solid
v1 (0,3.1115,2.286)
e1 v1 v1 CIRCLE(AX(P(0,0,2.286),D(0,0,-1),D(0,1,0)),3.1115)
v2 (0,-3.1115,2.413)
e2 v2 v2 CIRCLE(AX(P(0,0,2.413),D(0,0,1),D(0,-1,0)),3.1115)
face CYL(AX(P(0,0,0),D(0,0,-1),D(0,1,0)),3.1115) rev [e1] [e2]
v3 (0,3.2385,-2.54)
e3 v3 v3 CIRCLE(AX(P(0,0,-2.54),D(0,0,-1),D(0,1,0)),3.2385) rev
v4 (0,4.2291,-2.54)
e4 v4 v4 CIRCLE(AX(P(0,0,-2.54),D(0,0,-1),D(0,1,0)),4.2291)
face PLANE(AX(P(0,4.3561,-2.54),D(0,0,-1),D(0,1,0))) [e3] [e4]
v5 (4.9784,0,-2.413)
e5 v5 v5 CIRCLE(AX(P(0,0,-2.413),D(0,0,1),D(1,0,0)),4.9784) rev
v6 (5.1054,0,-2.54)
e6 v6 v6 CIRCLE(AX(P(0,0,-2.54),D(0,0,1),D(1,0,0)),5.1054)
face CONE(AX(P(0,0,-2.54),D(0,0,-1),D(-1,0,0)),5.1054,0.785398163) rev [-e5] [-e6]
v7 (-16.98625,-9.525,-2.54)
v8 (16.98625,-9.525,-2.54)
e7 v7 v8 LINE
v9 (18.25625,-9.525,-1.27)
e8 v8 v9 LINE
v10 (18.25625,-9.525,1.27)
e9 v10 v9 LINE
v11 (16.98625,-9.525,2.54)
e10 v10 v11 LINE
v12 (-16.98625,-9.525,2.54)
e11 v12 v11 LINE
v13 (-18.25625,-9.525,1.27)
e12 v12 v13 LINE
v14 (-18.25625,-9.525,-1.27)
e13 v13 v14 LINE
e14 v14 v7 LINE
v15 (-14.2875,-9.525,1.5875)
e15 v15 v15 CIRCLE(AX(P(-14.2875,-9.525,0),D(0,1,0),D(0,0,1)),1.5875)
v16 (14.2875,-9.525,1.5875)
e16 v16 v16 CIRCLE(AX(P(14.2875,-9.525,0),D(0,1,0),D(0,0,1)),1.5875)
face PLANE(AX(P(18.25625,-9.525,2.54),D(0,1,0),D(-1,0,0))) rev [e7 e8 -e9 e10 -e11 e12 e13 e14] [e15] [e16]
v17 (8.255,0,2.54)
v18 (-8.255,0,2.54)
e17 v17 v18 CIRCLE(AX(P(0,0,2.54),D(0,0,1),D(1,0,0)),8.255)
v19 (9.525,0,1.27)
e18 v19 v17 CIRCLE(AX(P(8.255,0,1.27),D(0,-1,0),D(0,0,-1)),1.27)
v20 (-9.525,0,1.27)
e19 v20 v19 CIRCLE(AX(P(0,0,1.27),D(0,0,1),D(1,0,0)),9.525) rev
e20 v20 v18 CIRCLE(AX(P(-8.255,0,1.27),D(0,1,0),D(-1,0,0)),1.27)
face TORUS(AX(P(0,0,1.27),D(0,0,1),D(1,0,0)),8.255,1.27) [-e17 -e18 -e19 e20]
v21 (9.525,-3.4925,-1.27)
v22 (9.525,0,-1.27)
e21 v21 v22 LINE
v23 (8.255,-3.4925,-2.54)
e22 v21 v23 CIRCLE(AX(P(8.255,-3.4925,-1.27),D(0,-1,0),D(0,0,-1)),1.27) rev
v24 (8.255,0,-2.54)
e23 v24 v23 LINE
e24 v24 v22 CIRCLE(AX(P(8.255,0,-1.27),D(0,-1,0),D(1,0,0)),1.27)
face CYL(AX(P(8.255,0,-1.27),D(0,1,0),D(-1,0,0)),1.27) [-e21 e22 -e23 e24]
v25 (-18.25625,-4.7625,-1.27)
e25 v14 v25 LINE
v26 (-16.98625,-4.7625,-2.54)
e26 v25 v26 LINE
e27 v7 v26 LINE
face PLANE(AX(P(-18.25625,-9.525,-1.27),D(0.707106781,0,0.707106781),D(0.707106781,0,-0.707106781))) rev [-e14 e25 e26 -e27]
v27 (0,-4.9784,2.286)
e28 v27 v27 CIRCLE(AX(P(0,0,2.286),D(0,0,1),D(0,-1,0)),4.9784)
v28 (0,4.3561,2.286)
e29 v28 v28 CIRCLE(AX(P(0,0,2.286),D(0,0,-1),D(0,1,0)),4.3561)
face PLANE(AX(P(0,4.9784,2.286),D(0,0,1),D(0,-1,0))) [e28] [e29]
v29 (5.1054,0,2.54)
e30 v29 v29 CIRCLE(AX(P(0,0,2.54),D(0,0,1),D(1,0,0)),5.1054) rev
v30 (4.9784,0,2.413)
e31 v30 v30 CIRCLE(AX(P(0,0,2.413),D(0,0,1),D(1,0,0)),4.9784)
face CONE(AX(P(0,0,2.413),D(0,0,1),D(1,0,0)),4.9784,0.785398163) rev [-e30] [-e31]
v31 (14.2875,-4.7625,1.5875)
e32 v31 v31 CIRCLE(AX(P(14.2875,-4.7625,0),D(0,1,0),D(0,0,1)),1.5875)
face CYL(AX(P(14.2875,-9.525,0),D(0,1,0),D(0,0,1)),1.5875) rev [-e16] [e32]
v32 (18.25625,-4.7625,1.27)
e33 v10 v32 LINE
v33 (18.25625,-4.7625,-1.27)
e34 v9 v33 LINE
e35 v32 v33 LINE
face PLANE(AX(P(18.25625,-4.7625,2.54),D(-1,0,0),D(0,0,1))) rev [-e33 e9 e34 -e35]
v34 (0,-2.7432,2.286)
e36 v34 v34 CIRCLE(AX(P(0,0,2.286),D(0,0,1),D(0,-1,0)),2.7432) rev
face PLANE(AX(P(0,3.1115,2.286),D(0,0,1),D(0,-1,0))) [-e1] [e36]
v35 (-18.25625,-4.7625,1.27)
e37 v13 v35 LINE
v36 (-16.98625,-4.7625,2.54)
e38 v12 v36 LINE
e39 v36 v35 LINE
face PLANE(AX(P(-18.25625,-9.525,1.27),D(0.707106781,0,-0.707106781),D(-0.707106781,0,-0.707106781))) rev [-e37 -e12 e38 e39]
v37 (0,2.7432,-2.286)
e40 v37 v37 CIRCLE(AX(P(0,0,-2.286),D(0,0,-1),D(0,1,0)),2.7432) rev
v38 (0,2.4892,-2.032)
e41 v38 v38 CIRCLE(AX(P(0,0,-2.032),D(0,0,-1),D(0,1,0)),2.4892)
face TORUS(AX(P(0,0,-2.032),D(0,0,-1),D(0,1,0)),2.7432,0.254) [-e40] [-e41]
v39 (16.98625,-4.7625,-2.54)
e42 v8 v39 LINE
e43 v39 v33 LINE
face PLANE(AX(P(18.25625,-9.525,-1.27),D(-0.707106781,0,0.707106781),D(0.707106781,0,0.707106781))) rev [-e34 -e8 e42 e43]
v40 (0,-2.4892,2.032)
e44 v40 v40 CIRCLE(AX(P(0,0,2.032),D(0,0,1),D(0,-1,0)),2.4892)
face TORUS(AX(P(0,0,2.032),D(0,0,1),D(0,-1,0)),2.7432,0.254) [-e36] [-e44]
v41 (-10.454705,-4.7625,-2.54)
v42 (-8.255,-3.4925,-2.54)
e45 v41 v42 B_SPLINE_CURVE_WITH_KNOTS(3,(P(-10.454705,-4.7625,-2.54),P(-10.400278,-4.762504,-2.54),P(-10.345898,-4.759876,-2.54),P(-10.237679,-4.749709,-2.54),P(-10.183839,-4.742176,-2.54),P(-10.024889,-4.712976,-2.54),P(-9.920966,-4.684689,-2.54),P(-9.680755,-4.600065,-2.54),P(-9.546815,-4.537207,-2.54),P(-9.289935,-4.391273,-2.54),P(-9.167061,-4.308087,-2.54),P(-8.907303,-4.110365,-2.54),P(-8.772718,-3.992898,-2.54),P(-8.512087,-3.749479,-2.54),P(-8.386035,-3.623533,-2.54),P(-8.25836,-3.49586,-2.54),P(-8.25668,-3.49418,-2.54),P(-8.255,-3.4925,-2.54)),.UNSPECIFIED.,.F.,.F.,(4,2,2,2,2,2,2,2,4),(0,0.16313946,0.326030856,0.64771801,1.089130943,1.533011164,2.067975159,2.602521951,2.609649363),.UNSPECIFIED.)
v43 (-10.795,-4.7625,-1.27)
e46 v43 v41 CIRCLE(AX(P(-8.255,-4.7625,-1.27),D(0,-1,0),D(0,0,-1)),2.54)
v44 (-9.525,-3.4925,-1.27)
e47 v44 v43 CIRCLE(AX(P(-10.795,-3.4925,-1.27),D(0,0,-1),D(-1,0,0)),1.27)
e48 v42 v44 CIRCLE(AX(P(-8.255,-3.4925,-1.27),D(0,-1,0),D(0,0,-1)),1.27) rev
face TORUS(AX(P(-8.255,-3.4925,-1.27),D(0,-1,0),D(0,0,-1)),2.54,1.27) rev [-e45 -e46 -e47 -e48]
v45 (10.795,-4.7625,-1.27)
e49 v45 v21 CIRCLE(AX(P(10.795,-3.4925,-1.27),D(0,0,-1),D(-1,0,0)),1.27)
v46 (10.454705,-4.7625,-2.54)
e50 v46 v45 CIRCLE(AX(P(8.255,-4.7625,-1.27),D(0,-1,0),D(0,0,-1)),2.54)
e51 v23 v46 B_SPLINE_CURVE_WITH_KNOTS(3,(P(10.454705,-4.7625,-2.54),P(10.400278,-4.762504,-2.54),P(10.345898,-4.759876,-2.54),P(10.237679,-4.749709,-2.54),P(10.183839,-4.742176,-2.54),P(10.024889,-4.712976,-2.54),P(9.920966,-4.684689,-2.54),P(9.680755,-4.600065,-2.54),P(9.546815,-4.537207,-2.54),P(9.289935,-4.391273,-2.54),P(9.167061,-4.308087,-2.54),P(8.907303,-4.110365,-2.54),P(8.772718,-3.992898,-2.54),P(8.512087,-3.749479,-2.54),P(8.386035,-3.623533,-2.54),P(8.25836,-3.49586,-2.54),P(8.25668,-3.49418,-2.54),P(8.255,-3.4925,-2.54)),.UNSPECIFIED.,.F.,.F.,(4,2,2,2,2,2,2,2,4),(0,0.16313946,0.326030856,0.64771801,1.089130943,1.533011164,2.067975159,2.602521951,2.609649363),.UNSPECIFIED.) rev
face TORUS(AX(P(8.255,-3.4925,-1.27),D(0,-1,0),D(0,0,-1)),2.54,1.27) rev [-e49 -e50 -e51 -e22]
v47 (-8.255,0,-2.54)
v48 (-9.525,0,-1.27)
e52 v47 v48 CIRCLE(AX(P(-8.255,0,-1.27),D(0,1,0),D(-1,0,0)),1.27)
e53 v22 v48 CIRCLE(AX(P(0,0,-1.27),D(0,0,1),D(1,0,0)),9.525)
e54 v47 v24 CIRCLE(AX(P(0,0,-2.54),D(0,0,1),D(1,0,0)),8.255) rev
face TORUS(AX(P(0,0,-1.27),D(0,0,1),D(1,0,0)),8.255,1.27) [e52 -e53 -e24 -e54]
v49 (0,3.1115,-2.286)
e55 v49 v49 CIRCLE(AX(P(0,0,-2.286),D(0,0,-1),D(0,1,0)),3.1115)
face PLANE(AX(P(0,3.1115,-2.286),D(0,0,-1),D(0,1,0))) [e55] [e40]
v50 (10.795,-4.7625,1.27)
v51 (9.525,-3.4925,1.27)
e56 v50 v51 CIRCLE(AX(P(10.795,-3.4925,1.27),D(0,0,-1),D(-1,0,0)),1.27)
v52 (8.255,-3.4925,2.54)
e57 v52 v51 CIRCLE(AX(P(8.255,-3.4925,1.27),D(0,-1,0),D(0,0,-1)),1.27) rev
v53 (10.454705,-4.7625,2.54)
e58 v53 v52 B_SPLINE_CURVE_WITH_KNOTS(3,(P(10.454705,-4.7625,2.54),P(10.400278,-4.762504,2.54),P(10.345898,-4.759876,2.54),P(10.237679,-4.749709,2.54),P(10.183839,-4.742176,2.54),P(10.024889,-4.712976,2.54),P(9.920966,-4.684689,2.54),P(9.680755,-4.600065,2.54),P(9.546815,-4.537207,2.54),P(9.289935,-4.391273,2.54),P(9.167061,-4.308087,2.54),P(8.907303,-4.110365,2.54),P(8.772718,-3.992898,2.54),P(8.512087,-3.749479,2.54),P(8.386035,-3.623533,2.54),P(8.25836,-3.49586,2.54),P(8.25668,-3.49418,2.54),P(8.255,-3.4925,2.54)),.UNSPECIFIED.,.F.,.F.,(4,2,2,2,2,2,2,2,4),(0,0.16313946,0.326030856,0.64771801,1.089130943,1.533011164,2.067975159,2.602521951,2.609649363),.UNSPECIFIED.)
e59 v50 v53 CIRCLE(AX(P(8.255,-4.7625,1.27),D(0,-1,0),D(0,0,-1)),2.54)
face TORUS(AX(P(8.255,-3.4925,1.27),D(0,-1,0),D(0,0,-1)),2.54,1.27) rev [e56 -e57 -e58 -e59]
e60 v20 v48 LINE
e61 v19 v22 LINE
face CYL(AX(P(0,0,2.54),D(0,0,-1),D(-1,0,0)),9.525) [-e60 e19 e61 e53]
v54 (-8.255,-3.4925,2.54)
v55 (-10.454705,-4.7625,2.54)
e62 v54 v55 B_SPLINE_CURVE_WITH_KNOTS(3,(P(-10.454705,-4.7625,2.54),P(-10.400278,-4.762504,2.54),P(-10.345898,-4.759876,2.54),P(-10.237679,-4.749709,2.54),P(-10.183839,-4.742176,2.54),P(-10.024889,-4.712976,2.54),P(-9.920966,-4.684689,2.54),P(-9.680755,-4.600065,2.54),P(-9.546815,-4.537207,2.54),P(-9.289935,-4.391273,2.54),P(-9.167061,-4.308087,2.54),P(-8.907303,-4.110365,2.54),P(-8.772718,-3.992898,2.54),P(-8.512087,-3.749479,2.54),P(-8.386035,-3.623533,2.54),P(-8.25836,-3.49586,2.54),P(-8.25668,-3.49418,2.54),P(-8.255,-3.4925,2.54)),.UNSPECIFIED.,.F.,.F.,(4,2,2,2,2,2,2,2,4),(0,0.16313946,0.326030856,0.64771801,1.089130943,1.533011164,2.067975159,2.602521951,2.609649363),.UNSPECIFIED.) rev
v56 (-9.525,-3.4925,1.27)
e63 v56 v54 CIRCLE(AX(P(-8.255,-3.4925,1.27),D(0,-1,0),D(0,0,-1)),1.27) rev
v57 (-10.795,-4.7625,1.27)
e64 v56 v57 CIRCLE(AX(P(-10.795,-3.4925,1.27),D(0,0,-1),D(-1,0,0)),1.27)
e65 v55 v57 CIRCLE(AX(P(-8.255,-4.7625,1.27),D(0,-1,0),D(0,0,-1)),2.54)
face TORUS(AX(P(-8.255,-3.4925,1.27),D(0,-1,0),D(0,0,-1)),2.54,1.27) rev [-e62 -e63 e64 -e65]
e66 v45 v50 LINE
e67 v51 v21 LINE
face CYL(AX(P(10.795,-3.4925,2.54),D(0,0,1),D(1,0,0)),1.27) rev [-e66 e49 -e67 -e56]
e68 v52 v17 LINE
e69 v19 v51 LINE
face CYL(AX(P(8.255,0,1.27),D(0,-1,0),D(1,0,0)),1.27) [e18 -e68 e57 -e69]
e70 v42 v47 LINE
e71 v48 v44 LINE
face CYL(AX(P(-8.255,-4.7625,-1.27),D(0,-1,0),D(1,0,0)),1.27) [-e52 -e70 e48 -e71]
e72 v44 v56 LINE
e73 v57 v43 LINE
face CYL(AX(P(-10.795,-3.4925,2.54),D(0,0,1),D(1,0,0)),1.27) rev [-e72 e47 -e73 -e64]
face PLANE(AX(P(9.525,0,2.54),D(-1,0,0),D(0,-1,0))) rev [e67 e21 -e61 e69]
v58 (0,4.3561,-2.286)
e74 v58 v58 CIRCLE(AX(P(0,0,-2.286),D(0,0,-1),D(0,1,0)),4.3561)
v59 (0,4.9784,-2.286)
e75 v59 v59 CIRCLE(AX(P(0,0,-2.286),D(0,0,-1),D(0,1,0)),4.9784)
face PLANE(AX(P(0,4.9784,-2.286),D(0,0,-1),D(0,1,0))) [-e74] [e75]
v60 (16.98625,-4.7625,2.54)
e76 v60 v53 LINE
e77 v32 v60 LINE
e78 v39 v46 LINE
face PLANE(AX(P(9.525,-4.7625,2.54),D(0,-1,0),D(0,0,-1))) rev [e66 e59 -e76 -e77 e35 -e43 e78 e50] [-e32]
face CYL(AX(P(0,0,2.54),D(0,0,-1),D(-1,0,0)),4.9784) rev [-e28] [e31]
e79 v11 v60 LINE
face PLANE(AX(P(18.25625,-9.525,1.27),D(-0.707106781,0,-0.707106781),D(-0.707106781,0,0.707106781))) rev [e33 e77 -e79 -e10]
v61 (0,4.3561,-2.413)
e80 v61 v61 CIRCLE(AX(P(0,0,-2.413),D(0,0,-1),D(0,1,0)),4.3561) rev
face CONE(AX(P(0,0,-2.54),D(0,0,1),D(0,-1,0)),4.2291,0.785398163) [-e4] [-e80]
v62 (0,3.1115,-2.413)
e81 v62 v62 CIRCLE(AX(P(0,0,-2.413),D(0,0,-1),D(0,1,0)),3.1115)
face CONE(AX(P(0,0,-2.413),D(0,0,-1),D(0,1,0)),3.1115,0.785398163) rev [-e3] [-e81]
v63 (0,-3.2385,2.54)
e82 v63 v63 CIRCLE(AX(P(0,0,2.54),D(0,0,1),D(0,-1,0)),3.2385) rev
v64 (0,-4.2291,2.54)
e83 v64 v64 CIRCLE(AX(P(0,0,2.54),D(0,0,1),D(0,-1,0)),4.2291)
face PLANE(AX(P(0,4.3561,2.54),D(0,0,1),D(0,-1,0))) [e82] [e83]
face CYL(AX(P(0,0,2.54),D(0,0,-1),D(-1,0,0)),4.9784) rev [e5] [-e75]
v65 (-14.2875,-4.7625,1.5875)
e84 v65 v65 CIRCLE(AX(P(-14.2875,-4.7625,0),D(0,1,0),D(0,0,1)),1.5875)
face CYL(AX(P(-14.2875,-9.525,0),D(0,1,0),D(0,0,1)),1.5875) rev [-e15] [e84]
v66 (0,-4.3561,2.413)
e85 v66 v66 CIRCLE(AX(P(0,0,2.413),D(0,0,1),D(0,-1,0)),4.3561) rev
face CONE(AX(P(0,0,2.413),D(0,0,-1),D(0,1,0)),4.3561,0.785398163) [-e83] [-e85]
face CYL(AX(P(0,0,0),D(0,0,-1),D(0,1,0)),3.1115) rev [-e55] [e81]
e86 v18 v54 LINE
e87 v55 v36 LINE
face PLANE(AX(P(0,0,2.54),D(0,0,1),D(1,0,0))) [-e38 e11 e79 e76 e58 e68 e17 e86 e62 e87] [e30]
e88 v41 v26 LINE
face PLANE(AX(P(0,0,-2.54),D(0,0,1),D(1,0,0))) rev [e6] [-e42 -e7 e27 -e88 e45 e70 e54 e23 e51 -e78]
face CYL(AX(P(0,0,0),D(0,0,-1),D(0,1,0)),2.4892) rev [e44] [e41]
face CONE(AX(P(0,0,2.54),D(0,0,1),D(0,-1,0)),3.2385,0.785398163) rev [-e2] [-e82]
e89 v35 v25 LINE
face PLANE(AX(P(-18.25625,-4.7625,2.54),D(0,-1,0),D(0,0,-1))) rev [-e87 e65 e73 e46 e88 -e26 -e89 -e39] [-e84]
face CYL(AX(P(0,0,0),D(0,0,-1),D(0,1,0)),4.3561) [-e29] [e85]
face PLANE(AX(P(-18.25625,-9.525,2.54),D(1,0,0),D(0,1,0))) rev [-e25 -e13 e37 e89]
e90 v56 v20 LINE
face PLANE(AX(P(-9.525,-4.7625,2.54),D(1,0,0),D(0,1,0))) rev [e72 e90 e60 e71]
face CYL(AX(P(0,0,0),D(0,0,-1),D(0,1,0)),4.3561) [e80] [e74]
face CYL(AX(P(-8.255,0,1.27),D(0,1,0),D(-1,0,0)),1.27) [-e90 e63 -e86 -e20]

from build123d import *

# Parameters (mm, degrees)
EXTRUDE1_DEPTH      = 2.54
EXTRUDE1_DEPTH_BACK = 2.54
SKETCH3_R           = 4.9784
SKETCH4_R           = 1.5875
CUT_EXTRUDE1_DEPTH  = 24.321126052
FILLET1_R           = 1.27
FILLET2_R           = 1.27
CHAMFER1_SIZE       = 0.127
FILLET3_R           = 0.254
CHAMFER2_SIZE       = 0.127


with BuildPart() as part:
    # Sketch3 → Extrude1 (new, two sides: drawn at the far end of the back side and taken through both)
    with BuildSketch(Plane.XY.offset(-EXTRUDE1_DEPTH_BACK)):
        with BuildLine():
            Line((9.525, 0), (9.525, -4.7625))
            Line((9.525, -4.7625), (18.25625, -4.7625))
            Line((18.25625, -4.7625), (18.25625, -9.525))
            Line((18.25625, -9.525), (-18.25625, -9.525))
            Line((-18.25625, -9.525), (-18.25625, -4.7625))
            Line((-18.25625, -4.7625), (-9.525, -4.7625))
            Line((-9.525, -4.7625), (-9.525, 0))
            ThreePointArc((-9.525, 0), (0, 9.525), (9.525, 0))
        make_face()
        Circle(SKETCH3_R, mode=Mode.SUBTRACT)
    extrude(amount=EXTRUDE1_DEPTH + EXTRUDE1_DEPTH_BACK)

    # Sketch4 → Cut-Extrude1 (cut, through all)
    with BuildSketch(Plane(origin=(0, -4.7625, 0), x_dir=(1, 0, 0), z_dir=(0, 1, 0))):
        with Locations(Location((-14.2875, 0, 0), (0, 0, 270))):
            Circle(SKETCH4_R)
        with Locations(Location((14.2875, 0, 0), (0, 0, 270))):
            Circle(SKETCH4_R)
        Polygon((-18.25625, 2.54), (-18.25625, 1.27), (-16.98625, 2.54), align=None)
        Polygon((16.98625, 2.54), (18.25625, 2.54), (18.25625, 1.27), align=None)
        Polygon((18.25625, -2.54), (18.25625, -1.27), (16.98625, -2.54), align=None)
        Polygon((-16.98625, -2.54), (-18.25625, -2.54), (-18.25625, -1.27), align=None)
    extrude(amount=-CUT_EXTRUDE1_DEPTH, mode=Mode.SUBTRACT)

    # Fillet1
    fillet1_edges = [part.edges().sort_by_distance(p)[0] for p in [
        (0, 9.525, -2.54),
        (9.525, -2.38125, -2.54),
        (9.525, -2.38125, 2.54),
        (-9.525, -2.38125, -2.54),
        (0, 9.525, 2.54),
        (-9.525, -2.38125, 2.54),
    ]]
    fillet(fillet1_edges, radius=FILLET1_R)

    # Fillet2
    # the kernel refuses this fillet: 1.27 mm, written as the material it adds along each edge
    with BuildSketch(Plane(origin=(-9.525, -4.7625, -1.27), x_dir=(0, 1, 0), z_dir=(0, 0, 1)), Plane(origin=(9.525, -4.7625, 1.27), x_dir=(0, 1, 0), z_dir=(0, 0, -1))) as fillet2_piece_1:
        with BuildLine():
            CenterArc((FILLET2_R, FILLET2_R), FILLET2_R, 180, 90)
            Line((0, FILLET2_R), (0, 0))
            Line((0, 0), (FILLET2_R, 0))
        make_face()
    extrude(amount=2.54)
    with BuildSketch(Plane(origin=(8.255, -4.7625, -1.27), x_dir=(-0.5976672776328268, 0, 0.8017442392976488), z_dir=(0.8017442392976488, 0, 0.5976672776328268))) as fillet2_piece_2_section:
        with BuildLine():
            CenterArc((1.27 + FILLET2_R, -FILLET2_R), FILLET2_R, 90, 90)
            Line((1.27 + FILLET2_R, 0), (1.27, 0))
            Line((1.27, 0), (1.27, -FILLET2_R))
        make_face()
    fillet2_piece_2 = revolve(axis=Axis((8.255, -4.7625, -1.27), (0, -1, 0)), revolution_arc=233.296989237, mode=Mode.PRIVATE)
    fillet2_piece_2 = split(fillet2_piece_2, bisect_by=Plane(origin=(9.207422318, -4.366731678, -2.54), z_dir=(0, 0, 1)), keep=Keep.TOP, mode=Mode.PRIVATE)
    add(fillet2_piece_2)
    with BuildSketch(Plane(origin=(-8.255, -4.7625, -1.27), x_dir=(0.5976672776328281, 0, 0.8017442392976479), z_dir=(-0.8017442392976479, 0, 0.5976672776328281))) as fillet2_piece_3_section:
        with BuildLine():
            CenterArc((1.27 + FILLET2_R, FILLET2_R), FILLET2_R, 180, 90)
            Line((1.27, FILLET2_R), (1.27, 0))
            Line((1.27, 0), (1.27 + FILLET2_R, 0))
        make_face()
    fillet2_piece_3 = revolve(axis=Axis((-8.255, -4.7625, -1.27), (0, 1, 0)), revolution_arc=233.296989237, mode=Mode.PRIVATE)
    fillet2_piece_3 = split(fillet2_piece_3, bisect_by=Plane(origin=(-9.207422451, -4.366732131, -2.54), z_dir=(0, 0, 1)), keep=Keep.TOP, mode=Mode.PRIVATE)
    add(fillet2_piece_3)
    with BuildSketch(Plane(origin=(8.255, -4.7625, 1.27), x_dir=(1, 0, 0), z_dir=(0, 0, -1))) as fillet2_piece_4_section:
        with BuildLine():
            CenterArc((1.27 + FILLET2_R, -FILLET2_R), FILLET2_R, 90, 90)
            Line((1.27 + FILLET2_R, 0), (1.27, 0))
            Line((1.27, 0), (1.27, -FILLET2_R))
        make_face()
    fillet2_piece_4 = revolve(axis=Axis((8.255, -4.7625, 1.27), (0, -1, 0)), revolution_arc=233.296989237, mode=Mode.PRIVATE)
    fillet2_piece_4 = split(fillet2_piece_4, bisect_by=Plane(origin=(9.207422382, -4.366731938, 2.54), z_dir=(0, 0, -1)), keep=Keep.TOP, mode=Mode.PRIVATE)
    add(fillet2_piece_4)
    with BuildSketch(Plane(origin=(-8.255, -4.7625, 1.27), x_dir=(-1, 0, 0), z_dir=(0, 0, -1))) as fillet2_piece_5_section:
        with BuildLine():
            CenterArc((1.27 + FILLET2_R, FILLET2_R), FILLET2_R, 180, 90)
            Line((1.27, FILLET2_R), (1.27, 0))
            Line((1.27, 0), (1.27 + FILLET2_R, 0))
        make_face()
    fillet2_piece_5 = revolve(axis=Axis((-8.255, -4.7625, 1.27), (0, 1, 0)), revolution_arc=233.296989237, mode=Mode.PRIVATE)
    fillet2_piece_5 = split(fillet2_piece_5, bisect_by=Plane(origin=(-9.804114567, -4.550028742, 2.54), z_dir=(0, 0, -1)), keep=Keep.TOP, mode=Mode.PRIVATE)
    add(fillet2_piece_5)

    # Chamfer1
    chamfer1_edges = [part.edges().sort_by_distance(p)[0] for p in [
        (-4.9784, 0, 2.54),
        (-4.9784, 0, -2.54),
    ]]
    chamfer(chamfer1_edges, length=CHAMFER1_SIZE)

    # Sketch5 → Revolve1 (revolve)
    with BuildSketch(Plane(origin=(0, 0, 0), x_dir=(0, 0, -1), z_dir=(1, 0, 0))):
        Polygon((-2.286, 4.9784), (-2.286, 4.3561), (-2.54, 4.3561), (-2.54, 3.1115), (-2.286, 3.1115), (-2.286, 2.4892), (2.286, 2.4892), (2.286, 3.1115), (2.54, 3.1115), (2.54, 4.3561), (2.286, 4.3561), (2.286, 4.9784), align=None)
    revolve(axis=Axis((0, 0, 0), (0, 0, 1)))

    # Fillet3
    fillet3_edges = [part.edges().sort_by_distance(p)[0] for p in [
        (0, -2.4892, -2.286),
        (0, -2.4892, 2.286),
    ]]
    fillet(fillet3_edges, radius=FILLET3_R)

    # Chamfer2
    chamfer2_edges = [part.edges().sort_by_distance(p)[0] for p in [
        (0, -4.3561, -2.54),
        (0, -3.1115, -2.54),
        (0, -3.1115, 2.54),
        (0, -4.3561, 2.54),
    ]]
    chamfer(chamfer2_edges, length=CHAMFER2_SIZE)


solid = part.part
